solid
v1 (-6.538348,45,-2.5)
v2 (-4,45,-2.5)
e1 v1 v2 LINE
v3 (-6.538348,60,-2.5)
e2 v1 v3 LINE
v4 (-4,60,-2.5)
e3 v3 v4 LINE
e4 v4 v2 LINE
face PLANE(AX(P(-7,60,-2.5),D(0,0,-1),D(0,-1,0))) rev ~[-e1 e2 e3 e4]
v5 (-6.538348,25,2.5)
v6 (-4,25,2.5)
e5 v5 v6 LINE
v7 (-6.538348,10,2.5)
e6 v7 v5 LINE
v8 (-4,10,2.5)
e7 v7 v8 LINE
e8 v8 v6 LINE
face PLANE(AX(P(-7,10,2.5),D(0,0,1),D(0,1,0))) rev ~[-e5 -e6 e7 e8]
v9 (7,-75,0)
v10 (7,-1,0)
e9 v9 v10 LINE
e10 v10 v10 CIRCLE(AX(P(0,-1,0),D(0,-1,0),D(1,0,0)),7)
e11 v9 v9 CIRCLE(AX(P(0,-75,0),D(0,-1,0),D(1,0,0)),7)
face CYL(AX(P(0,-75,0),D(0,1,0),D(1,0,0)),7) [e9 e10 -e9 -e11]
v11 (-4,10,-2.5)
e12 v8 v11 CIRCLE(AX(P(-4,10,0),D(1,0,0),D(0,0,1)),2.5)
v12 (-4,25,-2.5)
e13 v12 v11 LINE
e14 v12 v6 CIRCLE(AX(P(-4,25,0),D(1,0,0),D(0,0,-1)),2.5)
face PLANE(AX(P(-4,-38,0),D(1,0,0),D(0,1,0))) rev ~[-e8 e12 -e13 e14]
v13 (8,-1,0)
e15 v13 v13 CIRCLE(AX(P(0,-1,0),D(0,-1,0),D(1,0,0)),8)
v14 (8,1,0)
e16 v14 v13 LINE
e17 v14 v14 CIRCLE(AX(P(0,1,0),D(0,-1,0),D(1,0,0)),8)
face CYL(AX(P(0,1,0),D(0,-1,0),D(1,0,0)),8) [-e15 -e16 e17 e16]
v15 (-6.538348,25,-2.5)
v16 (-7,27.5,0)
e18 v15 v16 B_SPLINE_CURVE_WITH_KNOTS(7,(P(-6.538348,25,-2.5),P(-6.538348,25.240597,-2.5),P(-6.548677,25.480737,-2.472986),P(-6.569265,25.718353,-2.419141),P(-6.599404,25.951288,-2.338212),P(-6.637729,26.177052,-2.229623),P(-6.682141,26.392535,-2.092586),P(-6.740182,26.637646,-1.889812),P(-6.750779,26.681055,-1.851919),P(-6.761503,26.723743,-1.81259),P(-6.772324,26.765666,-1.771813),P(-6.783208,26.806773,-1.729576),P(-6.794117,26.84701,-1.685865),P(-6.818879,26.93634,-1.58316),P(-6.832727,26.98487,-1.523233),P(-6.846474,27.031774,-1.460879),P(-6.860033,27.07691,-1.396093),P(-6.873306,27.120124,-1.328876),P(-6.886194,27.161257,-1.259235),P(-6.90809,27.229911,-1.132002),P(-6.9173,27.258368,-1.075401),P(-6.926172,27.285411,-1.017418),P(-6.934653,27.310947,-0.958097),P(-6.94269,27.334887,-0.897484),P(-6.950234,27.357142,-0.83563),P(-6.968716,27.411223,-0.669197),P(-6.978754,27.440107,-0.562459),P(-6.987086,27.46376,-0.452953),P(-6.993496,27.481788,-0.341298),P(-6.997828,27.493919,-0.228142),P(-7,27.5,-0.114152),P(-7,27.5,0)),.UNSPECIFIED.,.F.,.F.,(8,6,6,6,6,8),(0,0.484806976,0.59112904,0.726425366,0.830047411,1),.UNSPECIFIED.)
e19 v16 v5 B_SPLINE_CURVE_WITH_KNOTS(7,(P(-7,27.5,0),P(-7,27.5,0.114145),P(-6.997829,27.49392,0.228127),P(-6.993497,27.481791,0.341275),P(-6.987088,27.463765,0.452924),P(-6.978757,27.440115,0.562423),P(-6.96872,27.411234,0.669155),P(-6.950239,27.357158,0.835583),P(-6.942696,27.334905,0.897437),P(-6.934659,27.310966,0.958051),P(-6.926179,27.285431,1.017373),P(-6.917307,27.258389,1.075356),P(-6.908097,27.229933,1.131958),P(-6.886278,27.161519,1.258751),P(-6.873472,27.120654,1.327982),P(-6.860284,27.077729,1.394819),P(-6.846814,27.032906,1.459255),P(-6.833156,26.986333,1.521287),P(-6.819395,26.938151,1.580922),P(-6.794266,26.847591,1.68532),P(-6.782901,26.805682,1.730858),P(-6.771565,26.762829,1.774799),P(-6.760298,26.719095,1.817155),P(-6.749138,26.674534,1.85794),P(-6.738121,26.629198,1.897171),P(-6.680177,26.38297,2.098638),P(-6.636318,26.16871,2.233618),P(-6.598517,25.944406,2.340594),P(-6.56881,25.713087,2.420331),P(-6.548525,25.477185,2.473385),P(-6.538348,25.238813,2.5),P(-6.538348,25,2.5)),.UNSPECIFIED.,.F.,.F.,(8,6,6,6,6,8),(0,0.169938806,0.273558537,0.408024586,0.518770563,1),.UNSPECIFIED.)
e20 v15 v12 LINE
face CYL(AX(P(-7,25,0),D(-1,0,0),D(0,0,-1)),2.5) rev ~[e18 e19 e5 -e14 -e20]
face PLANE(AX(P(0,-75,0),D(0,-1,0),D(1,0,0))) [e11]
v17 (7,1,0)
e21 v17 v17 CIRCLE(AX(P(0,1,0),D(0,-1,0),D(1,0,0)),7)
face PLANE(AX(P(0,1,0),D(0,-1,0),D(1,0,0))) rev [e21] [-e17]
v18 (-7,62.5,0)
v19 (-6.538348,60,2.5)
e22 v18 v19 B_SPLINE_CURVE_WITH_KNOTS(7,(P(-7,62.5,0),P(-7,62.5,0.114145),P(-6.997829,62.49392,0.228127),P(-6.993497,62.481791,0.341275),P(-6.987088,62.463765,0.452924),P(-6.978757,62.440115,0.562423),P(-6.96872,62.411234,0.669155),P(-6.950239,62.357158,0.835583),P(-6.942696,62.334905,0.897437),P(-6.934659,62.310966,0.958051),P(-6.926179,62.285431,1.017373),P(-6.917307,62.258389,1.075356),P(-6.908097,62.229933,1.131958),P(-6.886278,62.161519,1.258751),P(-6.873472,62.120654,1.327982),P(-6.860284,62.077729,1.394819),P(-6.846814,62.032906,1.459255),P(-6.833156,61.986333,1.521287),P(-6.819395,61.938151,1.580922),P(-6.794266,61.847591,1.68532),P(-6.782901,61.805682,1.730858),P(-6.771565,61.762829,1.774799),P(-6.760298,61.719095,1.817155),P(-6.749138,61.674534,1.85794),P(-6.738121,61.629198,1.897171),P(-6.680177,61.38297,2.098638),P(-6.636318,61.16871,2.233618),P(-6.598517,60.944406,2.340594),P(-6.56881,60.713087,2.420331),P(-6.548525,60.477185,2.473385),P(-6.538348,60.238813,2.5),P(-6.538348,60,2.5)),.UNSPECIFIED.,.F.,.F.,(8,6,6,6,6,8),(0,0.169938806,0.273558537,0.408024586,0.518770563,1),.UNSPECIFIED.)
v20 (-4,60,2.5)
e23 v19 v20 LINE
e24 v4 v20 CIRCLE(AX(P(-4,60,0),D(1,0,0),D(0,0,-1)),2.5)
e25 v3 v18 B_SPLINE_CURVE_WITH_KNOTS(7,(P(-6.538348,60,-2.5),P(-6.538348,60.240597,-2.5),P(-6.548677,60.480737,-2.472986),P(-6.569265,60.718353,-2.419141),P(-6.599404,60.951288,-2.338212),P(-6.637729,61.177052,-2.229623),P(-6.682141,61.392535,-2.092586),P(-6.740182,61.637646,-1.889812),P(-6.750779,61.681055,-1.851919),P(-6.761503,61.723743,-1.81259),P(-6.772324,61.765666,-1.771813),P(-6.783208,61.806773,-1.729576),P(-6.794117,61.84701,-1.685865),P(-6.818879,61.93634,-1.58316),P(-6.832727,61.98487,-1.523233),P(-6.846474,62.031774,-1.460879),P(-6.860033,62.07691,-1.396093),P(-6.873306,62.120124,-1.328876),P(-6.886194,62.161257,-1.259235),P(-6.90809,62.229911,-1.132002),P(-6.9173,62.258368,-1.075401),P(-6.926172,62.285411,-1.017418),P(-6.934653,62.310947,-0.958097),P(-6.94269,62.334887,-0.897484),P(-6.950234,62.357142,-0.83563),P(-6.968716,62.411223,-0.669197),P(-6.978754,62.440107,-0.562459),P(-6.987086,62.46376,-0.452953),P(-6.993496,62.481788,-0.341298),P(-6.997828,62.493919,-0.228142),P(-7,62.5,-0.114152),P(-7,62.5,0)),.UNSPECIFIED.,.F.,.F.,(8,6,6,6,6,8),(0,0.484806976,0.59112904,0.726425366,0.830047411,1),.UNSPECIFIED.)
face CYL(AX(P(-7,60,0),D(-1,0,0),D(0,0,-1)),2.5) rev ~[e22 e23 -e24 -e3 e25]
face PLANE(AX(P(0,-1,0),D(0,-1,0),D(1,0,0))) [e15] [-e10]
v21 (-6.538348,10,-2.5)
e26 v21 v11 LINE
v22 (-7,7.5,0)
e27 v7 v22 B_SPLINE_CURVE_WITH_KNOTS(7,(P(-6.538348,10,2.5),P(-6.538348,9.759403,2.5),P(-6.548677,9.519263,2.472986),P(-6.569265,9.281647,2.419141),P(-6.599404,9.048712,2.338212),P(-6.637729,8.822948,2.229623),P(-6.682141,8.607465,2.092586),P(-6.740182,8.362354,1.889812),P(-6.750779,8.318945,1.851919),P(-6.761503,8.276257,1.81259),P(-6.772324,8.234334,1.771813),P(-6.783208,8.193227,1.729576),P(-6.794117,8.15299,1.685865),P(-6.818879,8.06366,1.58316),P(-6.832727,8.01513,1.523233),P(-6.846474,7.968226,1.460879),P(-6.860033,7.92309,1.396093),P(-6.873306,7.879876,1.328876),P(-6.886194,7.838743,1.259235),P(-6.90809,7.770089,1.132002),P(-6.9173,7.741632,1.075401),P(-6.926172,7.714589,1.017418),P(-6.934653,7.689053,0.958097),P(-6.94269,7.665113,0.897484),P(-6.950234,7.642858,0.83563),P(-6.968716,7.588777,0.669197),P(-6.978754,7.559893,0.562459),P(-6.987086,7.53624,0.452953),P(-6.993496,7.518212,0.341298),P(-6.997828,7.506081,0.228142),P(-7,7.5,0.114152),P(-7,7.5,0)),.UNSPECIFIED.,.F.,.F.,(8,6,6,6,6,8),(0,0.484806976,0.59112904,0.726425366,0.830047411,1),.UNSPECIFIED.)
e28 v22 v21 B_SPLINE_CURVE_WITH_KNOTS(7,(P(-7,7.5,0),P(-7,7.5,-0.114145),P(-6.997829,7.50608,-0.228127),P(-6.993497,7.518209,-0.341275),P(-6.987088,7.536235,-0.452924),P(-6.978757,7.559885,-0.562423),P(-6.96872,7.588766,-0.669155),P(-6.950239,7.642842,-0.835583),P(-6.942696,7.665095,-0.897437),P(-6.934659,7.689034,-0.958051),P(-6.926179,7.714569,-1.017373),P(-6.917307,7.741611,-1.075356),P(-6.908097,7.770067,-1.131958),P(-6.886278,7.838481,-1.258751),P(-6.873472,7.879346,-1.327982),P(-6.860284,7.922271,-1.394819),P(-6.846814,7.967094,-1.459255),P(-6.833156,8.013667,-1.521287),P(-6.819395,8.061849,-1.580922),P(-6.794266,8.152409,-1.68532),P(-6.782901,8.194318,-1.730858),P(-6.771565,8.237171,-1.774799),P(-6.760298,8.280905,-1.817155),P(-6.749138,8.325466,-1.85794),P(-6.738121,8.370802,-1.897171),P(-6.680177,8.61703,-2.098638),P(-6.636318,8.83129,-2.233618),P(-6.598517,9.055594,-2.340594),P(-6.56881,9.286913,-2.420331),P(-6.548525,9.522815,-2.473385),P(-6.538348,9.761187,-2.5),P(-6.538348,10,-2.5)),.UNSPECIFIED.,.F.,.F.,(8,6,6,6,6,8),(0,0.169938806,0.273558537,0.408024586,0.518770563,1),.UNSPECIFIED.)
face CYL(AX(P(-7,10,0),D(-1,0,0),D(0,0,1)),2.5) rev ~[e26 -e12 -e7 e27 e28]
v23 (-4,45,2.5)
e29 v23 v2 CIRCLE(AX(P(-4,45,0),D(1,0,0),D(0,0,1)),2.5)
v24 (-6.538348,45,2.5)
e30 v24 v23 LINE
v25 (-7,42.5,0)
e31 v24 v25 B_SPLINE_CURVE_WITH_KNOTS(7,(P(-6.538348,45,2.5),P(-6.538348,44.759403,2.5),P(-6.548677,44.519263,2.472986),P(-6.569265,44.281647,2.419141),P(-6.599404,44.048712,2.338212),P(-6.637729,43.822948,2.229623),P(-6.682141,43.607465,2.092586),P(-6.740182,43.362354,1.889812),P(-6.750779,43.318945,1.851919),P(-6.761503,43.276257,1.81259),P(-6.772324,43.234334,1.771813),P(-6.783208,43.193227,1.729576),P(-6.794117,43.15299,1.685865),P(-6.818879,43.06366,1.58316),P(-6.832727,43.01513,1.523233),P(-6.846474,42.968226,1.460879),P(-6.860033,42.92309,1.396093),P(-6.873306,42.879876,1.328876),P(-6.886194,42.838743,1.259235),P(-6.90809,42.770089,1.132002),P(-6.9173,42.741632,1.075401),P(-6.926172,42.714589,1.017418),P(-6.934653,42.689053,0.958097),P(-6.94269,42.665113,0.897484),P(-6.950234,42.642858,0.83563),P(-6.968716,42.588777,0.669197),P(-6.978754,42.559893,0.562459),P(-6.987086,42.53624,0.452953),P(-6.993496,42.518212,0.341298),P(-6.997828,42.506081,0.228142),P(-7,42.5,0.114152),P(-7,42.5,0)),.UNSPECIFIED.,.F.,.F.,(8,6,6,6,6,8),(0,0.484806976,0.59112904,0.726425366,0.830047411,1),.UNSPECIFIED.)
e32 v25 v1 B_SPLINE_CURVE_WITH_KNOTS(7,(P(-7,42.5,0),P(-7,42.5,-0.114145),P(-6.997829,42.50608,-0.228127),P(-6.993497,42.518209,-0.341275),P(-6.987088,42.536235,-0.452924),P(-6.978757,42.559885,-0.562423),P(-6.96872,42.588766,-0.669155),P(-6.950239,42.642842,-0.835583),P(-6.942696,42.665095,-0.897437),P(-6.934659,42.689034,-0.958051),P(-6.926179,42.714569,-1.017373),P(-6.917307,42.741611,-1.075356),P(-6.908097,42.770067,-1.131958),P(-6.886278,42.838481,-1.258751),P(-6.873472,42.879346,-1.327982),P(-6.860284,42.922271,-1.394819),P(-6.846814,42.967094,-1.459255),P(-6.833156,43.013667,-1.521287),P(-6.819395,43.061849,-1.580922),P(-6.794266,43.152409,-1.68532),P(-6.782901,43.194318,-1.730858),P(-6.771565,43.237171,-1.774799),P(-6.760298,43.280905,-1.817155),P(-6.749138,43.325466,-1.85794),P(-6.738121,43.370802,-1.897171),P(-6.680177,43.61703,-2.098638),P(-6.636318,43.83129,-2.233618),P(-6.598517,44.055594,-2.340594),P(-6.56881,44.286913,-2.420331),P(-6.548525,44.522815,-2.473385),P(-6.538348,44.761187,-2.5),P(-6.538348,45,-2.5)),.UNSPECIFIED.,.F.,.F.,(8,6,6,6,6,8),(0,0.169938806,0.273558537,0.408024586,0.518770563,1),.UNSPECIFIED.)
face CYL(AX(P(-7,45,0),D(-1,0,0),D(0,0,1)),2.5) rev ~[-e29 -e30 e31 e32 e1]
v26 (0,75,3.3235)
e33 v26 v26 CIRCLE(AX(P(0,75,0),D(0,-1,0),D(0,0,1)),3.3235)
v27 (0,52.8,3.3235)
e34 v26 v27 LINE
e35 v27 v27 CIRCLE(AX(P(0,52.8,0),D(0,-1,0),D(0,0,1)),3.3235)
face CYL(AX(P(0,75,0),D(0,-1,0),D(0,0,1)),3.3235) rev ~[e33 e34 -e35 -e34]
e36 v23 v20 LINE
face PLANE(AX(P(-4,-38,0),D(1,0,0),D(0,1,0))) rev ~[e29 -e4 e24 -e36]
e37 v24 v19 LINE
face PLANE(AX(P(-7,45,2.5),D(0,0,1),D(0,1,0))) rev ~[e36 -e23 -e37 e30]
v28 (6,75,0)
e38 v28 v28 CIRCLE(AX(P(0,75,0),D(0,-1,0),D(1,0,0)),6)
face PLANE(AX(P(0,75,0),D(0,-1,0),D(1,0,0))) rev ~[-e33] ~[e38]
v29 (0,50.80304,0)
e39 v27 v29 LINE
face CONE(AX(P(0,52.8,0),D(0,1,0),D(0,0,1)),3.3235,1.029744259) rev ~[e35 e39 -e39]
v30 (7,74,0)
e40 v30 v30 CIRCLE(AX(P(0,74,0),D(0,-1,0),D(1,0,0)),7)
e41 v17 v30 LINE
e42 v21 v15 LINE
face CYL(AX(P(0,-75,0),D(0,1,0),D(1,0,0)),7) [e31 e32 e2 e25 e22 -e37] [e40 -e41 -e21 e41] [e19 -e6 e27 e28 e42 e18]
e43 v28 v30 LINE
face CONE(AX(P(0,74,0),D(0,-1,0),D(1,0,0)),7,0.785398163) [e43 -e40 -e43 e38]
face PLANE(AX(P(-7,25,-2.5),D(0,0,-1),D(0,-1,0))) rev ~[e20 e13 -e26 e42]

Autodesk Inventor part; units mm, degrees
ref_plane "XZ Plane" through (0, 0, 0) normal (0, 1, 0) x (-1, 0, 0)
ref_plane "XY Plane" through (0, 0, 0) normal (0, 0, 1) x (1, 0, 0)
sketch "Sketch1" plane through (0, 0, 0) normal (0, 0, 1) x (1, 0, 0)
  line L0 (0, 75) -> (0, -75)
  line L1 (7, 75) -> (0, 75)
  line L2 (7, -75) -> (0, -75)
  line L3 (7, -75) -> (7, 75)
  line L4 (7, 1) -> (8, 1)
  line L5 (8, 1) -> (8, -1)
  line L6 (8, -1) -> (7, -1)
  point P0 (0, 0)
  point P1 (0, 0)
  point P2 (3.5, 75)
  point P3 (8, 0)
  dimension "d17" = 14
  dimension "d42" = 150
  dimension "d43" = 75
  dimension "d44" = 2
  dimension "d45" = 16
revolve "Revolution1" add sketch "Sketch1" angle 360 about axis through (0, 75, 0) along (0, -1, 0)
sketch "Sketch4" plane through (0, 75, 0) normal (0, 1, 0) x (1, 0, 0)
  point P0 (0, 0)
  point P1 (0, 0)
hole "Hole1" at (0, 75, 0) direction (0, -1, 0) diameter 6.647 depth 22.2 tip angle 118 thread size "M8x1.25" class "6H" standard "ISO Metric profile"
chamfer "Chamfer1" distance 1 angle 45 1 edges at (-7, 75, 0)
ref_plane "Work Plane1" through (-7, -38, 0) normal (1, 0, 0) x (0, 1, 0)
sketch "Sketch5" plane through (-7, -38, 0) normal (1, 0, 0) x (0, 1, 0)
  line L0 (-37, 7) -> (-37, -7) projected
  line L1 (112, -7) -> (112, 7) projected
  line L2 (98, 0) -> (83, 0) construction
  line L3 (98, -2.5) -> (83, -2.5)
  line L4 (83, 2.5) -> (98, 2.5)
  arc A0 (98, -2.5) -> (98, 2.5) centre (98, 0) ccw
  arc A1 (83, 2.5) -> (83, -2.5) centre (83, 0) ccw
  line L5 (113, 6) -> (113, -6) projected
  line L6 (63, 0) -> (48, 0) construction
  line L7 (63, -2.5) -> (48, -2.5)
  line L8 (48, 2.5) -> (63, 2.5)
  arc A2 (63, -2.5) -> (63, 2.5) centre (63, 0) ccw
  arc A3 (48, 2.5) -> (48, -2.5) centre (48, 0) ccw
  point P0 (38, 0)
  point P1 (90.5, 0)
  point P2 (55.5, 0)
  dimension "d36" = 5
  dimension "d37" = 15
  dimension "d39" = 15
  dimension "d46" = 5
  dimension "d47" = 15
  dimension "d48" = 35
extrude "Extrusion3" cut sketch "Sketch5" along normal blind 3
equation "\"d47\" = d37"
equation "\"d43\" = 0.5 * d42"
properties part number "приводной вал"
